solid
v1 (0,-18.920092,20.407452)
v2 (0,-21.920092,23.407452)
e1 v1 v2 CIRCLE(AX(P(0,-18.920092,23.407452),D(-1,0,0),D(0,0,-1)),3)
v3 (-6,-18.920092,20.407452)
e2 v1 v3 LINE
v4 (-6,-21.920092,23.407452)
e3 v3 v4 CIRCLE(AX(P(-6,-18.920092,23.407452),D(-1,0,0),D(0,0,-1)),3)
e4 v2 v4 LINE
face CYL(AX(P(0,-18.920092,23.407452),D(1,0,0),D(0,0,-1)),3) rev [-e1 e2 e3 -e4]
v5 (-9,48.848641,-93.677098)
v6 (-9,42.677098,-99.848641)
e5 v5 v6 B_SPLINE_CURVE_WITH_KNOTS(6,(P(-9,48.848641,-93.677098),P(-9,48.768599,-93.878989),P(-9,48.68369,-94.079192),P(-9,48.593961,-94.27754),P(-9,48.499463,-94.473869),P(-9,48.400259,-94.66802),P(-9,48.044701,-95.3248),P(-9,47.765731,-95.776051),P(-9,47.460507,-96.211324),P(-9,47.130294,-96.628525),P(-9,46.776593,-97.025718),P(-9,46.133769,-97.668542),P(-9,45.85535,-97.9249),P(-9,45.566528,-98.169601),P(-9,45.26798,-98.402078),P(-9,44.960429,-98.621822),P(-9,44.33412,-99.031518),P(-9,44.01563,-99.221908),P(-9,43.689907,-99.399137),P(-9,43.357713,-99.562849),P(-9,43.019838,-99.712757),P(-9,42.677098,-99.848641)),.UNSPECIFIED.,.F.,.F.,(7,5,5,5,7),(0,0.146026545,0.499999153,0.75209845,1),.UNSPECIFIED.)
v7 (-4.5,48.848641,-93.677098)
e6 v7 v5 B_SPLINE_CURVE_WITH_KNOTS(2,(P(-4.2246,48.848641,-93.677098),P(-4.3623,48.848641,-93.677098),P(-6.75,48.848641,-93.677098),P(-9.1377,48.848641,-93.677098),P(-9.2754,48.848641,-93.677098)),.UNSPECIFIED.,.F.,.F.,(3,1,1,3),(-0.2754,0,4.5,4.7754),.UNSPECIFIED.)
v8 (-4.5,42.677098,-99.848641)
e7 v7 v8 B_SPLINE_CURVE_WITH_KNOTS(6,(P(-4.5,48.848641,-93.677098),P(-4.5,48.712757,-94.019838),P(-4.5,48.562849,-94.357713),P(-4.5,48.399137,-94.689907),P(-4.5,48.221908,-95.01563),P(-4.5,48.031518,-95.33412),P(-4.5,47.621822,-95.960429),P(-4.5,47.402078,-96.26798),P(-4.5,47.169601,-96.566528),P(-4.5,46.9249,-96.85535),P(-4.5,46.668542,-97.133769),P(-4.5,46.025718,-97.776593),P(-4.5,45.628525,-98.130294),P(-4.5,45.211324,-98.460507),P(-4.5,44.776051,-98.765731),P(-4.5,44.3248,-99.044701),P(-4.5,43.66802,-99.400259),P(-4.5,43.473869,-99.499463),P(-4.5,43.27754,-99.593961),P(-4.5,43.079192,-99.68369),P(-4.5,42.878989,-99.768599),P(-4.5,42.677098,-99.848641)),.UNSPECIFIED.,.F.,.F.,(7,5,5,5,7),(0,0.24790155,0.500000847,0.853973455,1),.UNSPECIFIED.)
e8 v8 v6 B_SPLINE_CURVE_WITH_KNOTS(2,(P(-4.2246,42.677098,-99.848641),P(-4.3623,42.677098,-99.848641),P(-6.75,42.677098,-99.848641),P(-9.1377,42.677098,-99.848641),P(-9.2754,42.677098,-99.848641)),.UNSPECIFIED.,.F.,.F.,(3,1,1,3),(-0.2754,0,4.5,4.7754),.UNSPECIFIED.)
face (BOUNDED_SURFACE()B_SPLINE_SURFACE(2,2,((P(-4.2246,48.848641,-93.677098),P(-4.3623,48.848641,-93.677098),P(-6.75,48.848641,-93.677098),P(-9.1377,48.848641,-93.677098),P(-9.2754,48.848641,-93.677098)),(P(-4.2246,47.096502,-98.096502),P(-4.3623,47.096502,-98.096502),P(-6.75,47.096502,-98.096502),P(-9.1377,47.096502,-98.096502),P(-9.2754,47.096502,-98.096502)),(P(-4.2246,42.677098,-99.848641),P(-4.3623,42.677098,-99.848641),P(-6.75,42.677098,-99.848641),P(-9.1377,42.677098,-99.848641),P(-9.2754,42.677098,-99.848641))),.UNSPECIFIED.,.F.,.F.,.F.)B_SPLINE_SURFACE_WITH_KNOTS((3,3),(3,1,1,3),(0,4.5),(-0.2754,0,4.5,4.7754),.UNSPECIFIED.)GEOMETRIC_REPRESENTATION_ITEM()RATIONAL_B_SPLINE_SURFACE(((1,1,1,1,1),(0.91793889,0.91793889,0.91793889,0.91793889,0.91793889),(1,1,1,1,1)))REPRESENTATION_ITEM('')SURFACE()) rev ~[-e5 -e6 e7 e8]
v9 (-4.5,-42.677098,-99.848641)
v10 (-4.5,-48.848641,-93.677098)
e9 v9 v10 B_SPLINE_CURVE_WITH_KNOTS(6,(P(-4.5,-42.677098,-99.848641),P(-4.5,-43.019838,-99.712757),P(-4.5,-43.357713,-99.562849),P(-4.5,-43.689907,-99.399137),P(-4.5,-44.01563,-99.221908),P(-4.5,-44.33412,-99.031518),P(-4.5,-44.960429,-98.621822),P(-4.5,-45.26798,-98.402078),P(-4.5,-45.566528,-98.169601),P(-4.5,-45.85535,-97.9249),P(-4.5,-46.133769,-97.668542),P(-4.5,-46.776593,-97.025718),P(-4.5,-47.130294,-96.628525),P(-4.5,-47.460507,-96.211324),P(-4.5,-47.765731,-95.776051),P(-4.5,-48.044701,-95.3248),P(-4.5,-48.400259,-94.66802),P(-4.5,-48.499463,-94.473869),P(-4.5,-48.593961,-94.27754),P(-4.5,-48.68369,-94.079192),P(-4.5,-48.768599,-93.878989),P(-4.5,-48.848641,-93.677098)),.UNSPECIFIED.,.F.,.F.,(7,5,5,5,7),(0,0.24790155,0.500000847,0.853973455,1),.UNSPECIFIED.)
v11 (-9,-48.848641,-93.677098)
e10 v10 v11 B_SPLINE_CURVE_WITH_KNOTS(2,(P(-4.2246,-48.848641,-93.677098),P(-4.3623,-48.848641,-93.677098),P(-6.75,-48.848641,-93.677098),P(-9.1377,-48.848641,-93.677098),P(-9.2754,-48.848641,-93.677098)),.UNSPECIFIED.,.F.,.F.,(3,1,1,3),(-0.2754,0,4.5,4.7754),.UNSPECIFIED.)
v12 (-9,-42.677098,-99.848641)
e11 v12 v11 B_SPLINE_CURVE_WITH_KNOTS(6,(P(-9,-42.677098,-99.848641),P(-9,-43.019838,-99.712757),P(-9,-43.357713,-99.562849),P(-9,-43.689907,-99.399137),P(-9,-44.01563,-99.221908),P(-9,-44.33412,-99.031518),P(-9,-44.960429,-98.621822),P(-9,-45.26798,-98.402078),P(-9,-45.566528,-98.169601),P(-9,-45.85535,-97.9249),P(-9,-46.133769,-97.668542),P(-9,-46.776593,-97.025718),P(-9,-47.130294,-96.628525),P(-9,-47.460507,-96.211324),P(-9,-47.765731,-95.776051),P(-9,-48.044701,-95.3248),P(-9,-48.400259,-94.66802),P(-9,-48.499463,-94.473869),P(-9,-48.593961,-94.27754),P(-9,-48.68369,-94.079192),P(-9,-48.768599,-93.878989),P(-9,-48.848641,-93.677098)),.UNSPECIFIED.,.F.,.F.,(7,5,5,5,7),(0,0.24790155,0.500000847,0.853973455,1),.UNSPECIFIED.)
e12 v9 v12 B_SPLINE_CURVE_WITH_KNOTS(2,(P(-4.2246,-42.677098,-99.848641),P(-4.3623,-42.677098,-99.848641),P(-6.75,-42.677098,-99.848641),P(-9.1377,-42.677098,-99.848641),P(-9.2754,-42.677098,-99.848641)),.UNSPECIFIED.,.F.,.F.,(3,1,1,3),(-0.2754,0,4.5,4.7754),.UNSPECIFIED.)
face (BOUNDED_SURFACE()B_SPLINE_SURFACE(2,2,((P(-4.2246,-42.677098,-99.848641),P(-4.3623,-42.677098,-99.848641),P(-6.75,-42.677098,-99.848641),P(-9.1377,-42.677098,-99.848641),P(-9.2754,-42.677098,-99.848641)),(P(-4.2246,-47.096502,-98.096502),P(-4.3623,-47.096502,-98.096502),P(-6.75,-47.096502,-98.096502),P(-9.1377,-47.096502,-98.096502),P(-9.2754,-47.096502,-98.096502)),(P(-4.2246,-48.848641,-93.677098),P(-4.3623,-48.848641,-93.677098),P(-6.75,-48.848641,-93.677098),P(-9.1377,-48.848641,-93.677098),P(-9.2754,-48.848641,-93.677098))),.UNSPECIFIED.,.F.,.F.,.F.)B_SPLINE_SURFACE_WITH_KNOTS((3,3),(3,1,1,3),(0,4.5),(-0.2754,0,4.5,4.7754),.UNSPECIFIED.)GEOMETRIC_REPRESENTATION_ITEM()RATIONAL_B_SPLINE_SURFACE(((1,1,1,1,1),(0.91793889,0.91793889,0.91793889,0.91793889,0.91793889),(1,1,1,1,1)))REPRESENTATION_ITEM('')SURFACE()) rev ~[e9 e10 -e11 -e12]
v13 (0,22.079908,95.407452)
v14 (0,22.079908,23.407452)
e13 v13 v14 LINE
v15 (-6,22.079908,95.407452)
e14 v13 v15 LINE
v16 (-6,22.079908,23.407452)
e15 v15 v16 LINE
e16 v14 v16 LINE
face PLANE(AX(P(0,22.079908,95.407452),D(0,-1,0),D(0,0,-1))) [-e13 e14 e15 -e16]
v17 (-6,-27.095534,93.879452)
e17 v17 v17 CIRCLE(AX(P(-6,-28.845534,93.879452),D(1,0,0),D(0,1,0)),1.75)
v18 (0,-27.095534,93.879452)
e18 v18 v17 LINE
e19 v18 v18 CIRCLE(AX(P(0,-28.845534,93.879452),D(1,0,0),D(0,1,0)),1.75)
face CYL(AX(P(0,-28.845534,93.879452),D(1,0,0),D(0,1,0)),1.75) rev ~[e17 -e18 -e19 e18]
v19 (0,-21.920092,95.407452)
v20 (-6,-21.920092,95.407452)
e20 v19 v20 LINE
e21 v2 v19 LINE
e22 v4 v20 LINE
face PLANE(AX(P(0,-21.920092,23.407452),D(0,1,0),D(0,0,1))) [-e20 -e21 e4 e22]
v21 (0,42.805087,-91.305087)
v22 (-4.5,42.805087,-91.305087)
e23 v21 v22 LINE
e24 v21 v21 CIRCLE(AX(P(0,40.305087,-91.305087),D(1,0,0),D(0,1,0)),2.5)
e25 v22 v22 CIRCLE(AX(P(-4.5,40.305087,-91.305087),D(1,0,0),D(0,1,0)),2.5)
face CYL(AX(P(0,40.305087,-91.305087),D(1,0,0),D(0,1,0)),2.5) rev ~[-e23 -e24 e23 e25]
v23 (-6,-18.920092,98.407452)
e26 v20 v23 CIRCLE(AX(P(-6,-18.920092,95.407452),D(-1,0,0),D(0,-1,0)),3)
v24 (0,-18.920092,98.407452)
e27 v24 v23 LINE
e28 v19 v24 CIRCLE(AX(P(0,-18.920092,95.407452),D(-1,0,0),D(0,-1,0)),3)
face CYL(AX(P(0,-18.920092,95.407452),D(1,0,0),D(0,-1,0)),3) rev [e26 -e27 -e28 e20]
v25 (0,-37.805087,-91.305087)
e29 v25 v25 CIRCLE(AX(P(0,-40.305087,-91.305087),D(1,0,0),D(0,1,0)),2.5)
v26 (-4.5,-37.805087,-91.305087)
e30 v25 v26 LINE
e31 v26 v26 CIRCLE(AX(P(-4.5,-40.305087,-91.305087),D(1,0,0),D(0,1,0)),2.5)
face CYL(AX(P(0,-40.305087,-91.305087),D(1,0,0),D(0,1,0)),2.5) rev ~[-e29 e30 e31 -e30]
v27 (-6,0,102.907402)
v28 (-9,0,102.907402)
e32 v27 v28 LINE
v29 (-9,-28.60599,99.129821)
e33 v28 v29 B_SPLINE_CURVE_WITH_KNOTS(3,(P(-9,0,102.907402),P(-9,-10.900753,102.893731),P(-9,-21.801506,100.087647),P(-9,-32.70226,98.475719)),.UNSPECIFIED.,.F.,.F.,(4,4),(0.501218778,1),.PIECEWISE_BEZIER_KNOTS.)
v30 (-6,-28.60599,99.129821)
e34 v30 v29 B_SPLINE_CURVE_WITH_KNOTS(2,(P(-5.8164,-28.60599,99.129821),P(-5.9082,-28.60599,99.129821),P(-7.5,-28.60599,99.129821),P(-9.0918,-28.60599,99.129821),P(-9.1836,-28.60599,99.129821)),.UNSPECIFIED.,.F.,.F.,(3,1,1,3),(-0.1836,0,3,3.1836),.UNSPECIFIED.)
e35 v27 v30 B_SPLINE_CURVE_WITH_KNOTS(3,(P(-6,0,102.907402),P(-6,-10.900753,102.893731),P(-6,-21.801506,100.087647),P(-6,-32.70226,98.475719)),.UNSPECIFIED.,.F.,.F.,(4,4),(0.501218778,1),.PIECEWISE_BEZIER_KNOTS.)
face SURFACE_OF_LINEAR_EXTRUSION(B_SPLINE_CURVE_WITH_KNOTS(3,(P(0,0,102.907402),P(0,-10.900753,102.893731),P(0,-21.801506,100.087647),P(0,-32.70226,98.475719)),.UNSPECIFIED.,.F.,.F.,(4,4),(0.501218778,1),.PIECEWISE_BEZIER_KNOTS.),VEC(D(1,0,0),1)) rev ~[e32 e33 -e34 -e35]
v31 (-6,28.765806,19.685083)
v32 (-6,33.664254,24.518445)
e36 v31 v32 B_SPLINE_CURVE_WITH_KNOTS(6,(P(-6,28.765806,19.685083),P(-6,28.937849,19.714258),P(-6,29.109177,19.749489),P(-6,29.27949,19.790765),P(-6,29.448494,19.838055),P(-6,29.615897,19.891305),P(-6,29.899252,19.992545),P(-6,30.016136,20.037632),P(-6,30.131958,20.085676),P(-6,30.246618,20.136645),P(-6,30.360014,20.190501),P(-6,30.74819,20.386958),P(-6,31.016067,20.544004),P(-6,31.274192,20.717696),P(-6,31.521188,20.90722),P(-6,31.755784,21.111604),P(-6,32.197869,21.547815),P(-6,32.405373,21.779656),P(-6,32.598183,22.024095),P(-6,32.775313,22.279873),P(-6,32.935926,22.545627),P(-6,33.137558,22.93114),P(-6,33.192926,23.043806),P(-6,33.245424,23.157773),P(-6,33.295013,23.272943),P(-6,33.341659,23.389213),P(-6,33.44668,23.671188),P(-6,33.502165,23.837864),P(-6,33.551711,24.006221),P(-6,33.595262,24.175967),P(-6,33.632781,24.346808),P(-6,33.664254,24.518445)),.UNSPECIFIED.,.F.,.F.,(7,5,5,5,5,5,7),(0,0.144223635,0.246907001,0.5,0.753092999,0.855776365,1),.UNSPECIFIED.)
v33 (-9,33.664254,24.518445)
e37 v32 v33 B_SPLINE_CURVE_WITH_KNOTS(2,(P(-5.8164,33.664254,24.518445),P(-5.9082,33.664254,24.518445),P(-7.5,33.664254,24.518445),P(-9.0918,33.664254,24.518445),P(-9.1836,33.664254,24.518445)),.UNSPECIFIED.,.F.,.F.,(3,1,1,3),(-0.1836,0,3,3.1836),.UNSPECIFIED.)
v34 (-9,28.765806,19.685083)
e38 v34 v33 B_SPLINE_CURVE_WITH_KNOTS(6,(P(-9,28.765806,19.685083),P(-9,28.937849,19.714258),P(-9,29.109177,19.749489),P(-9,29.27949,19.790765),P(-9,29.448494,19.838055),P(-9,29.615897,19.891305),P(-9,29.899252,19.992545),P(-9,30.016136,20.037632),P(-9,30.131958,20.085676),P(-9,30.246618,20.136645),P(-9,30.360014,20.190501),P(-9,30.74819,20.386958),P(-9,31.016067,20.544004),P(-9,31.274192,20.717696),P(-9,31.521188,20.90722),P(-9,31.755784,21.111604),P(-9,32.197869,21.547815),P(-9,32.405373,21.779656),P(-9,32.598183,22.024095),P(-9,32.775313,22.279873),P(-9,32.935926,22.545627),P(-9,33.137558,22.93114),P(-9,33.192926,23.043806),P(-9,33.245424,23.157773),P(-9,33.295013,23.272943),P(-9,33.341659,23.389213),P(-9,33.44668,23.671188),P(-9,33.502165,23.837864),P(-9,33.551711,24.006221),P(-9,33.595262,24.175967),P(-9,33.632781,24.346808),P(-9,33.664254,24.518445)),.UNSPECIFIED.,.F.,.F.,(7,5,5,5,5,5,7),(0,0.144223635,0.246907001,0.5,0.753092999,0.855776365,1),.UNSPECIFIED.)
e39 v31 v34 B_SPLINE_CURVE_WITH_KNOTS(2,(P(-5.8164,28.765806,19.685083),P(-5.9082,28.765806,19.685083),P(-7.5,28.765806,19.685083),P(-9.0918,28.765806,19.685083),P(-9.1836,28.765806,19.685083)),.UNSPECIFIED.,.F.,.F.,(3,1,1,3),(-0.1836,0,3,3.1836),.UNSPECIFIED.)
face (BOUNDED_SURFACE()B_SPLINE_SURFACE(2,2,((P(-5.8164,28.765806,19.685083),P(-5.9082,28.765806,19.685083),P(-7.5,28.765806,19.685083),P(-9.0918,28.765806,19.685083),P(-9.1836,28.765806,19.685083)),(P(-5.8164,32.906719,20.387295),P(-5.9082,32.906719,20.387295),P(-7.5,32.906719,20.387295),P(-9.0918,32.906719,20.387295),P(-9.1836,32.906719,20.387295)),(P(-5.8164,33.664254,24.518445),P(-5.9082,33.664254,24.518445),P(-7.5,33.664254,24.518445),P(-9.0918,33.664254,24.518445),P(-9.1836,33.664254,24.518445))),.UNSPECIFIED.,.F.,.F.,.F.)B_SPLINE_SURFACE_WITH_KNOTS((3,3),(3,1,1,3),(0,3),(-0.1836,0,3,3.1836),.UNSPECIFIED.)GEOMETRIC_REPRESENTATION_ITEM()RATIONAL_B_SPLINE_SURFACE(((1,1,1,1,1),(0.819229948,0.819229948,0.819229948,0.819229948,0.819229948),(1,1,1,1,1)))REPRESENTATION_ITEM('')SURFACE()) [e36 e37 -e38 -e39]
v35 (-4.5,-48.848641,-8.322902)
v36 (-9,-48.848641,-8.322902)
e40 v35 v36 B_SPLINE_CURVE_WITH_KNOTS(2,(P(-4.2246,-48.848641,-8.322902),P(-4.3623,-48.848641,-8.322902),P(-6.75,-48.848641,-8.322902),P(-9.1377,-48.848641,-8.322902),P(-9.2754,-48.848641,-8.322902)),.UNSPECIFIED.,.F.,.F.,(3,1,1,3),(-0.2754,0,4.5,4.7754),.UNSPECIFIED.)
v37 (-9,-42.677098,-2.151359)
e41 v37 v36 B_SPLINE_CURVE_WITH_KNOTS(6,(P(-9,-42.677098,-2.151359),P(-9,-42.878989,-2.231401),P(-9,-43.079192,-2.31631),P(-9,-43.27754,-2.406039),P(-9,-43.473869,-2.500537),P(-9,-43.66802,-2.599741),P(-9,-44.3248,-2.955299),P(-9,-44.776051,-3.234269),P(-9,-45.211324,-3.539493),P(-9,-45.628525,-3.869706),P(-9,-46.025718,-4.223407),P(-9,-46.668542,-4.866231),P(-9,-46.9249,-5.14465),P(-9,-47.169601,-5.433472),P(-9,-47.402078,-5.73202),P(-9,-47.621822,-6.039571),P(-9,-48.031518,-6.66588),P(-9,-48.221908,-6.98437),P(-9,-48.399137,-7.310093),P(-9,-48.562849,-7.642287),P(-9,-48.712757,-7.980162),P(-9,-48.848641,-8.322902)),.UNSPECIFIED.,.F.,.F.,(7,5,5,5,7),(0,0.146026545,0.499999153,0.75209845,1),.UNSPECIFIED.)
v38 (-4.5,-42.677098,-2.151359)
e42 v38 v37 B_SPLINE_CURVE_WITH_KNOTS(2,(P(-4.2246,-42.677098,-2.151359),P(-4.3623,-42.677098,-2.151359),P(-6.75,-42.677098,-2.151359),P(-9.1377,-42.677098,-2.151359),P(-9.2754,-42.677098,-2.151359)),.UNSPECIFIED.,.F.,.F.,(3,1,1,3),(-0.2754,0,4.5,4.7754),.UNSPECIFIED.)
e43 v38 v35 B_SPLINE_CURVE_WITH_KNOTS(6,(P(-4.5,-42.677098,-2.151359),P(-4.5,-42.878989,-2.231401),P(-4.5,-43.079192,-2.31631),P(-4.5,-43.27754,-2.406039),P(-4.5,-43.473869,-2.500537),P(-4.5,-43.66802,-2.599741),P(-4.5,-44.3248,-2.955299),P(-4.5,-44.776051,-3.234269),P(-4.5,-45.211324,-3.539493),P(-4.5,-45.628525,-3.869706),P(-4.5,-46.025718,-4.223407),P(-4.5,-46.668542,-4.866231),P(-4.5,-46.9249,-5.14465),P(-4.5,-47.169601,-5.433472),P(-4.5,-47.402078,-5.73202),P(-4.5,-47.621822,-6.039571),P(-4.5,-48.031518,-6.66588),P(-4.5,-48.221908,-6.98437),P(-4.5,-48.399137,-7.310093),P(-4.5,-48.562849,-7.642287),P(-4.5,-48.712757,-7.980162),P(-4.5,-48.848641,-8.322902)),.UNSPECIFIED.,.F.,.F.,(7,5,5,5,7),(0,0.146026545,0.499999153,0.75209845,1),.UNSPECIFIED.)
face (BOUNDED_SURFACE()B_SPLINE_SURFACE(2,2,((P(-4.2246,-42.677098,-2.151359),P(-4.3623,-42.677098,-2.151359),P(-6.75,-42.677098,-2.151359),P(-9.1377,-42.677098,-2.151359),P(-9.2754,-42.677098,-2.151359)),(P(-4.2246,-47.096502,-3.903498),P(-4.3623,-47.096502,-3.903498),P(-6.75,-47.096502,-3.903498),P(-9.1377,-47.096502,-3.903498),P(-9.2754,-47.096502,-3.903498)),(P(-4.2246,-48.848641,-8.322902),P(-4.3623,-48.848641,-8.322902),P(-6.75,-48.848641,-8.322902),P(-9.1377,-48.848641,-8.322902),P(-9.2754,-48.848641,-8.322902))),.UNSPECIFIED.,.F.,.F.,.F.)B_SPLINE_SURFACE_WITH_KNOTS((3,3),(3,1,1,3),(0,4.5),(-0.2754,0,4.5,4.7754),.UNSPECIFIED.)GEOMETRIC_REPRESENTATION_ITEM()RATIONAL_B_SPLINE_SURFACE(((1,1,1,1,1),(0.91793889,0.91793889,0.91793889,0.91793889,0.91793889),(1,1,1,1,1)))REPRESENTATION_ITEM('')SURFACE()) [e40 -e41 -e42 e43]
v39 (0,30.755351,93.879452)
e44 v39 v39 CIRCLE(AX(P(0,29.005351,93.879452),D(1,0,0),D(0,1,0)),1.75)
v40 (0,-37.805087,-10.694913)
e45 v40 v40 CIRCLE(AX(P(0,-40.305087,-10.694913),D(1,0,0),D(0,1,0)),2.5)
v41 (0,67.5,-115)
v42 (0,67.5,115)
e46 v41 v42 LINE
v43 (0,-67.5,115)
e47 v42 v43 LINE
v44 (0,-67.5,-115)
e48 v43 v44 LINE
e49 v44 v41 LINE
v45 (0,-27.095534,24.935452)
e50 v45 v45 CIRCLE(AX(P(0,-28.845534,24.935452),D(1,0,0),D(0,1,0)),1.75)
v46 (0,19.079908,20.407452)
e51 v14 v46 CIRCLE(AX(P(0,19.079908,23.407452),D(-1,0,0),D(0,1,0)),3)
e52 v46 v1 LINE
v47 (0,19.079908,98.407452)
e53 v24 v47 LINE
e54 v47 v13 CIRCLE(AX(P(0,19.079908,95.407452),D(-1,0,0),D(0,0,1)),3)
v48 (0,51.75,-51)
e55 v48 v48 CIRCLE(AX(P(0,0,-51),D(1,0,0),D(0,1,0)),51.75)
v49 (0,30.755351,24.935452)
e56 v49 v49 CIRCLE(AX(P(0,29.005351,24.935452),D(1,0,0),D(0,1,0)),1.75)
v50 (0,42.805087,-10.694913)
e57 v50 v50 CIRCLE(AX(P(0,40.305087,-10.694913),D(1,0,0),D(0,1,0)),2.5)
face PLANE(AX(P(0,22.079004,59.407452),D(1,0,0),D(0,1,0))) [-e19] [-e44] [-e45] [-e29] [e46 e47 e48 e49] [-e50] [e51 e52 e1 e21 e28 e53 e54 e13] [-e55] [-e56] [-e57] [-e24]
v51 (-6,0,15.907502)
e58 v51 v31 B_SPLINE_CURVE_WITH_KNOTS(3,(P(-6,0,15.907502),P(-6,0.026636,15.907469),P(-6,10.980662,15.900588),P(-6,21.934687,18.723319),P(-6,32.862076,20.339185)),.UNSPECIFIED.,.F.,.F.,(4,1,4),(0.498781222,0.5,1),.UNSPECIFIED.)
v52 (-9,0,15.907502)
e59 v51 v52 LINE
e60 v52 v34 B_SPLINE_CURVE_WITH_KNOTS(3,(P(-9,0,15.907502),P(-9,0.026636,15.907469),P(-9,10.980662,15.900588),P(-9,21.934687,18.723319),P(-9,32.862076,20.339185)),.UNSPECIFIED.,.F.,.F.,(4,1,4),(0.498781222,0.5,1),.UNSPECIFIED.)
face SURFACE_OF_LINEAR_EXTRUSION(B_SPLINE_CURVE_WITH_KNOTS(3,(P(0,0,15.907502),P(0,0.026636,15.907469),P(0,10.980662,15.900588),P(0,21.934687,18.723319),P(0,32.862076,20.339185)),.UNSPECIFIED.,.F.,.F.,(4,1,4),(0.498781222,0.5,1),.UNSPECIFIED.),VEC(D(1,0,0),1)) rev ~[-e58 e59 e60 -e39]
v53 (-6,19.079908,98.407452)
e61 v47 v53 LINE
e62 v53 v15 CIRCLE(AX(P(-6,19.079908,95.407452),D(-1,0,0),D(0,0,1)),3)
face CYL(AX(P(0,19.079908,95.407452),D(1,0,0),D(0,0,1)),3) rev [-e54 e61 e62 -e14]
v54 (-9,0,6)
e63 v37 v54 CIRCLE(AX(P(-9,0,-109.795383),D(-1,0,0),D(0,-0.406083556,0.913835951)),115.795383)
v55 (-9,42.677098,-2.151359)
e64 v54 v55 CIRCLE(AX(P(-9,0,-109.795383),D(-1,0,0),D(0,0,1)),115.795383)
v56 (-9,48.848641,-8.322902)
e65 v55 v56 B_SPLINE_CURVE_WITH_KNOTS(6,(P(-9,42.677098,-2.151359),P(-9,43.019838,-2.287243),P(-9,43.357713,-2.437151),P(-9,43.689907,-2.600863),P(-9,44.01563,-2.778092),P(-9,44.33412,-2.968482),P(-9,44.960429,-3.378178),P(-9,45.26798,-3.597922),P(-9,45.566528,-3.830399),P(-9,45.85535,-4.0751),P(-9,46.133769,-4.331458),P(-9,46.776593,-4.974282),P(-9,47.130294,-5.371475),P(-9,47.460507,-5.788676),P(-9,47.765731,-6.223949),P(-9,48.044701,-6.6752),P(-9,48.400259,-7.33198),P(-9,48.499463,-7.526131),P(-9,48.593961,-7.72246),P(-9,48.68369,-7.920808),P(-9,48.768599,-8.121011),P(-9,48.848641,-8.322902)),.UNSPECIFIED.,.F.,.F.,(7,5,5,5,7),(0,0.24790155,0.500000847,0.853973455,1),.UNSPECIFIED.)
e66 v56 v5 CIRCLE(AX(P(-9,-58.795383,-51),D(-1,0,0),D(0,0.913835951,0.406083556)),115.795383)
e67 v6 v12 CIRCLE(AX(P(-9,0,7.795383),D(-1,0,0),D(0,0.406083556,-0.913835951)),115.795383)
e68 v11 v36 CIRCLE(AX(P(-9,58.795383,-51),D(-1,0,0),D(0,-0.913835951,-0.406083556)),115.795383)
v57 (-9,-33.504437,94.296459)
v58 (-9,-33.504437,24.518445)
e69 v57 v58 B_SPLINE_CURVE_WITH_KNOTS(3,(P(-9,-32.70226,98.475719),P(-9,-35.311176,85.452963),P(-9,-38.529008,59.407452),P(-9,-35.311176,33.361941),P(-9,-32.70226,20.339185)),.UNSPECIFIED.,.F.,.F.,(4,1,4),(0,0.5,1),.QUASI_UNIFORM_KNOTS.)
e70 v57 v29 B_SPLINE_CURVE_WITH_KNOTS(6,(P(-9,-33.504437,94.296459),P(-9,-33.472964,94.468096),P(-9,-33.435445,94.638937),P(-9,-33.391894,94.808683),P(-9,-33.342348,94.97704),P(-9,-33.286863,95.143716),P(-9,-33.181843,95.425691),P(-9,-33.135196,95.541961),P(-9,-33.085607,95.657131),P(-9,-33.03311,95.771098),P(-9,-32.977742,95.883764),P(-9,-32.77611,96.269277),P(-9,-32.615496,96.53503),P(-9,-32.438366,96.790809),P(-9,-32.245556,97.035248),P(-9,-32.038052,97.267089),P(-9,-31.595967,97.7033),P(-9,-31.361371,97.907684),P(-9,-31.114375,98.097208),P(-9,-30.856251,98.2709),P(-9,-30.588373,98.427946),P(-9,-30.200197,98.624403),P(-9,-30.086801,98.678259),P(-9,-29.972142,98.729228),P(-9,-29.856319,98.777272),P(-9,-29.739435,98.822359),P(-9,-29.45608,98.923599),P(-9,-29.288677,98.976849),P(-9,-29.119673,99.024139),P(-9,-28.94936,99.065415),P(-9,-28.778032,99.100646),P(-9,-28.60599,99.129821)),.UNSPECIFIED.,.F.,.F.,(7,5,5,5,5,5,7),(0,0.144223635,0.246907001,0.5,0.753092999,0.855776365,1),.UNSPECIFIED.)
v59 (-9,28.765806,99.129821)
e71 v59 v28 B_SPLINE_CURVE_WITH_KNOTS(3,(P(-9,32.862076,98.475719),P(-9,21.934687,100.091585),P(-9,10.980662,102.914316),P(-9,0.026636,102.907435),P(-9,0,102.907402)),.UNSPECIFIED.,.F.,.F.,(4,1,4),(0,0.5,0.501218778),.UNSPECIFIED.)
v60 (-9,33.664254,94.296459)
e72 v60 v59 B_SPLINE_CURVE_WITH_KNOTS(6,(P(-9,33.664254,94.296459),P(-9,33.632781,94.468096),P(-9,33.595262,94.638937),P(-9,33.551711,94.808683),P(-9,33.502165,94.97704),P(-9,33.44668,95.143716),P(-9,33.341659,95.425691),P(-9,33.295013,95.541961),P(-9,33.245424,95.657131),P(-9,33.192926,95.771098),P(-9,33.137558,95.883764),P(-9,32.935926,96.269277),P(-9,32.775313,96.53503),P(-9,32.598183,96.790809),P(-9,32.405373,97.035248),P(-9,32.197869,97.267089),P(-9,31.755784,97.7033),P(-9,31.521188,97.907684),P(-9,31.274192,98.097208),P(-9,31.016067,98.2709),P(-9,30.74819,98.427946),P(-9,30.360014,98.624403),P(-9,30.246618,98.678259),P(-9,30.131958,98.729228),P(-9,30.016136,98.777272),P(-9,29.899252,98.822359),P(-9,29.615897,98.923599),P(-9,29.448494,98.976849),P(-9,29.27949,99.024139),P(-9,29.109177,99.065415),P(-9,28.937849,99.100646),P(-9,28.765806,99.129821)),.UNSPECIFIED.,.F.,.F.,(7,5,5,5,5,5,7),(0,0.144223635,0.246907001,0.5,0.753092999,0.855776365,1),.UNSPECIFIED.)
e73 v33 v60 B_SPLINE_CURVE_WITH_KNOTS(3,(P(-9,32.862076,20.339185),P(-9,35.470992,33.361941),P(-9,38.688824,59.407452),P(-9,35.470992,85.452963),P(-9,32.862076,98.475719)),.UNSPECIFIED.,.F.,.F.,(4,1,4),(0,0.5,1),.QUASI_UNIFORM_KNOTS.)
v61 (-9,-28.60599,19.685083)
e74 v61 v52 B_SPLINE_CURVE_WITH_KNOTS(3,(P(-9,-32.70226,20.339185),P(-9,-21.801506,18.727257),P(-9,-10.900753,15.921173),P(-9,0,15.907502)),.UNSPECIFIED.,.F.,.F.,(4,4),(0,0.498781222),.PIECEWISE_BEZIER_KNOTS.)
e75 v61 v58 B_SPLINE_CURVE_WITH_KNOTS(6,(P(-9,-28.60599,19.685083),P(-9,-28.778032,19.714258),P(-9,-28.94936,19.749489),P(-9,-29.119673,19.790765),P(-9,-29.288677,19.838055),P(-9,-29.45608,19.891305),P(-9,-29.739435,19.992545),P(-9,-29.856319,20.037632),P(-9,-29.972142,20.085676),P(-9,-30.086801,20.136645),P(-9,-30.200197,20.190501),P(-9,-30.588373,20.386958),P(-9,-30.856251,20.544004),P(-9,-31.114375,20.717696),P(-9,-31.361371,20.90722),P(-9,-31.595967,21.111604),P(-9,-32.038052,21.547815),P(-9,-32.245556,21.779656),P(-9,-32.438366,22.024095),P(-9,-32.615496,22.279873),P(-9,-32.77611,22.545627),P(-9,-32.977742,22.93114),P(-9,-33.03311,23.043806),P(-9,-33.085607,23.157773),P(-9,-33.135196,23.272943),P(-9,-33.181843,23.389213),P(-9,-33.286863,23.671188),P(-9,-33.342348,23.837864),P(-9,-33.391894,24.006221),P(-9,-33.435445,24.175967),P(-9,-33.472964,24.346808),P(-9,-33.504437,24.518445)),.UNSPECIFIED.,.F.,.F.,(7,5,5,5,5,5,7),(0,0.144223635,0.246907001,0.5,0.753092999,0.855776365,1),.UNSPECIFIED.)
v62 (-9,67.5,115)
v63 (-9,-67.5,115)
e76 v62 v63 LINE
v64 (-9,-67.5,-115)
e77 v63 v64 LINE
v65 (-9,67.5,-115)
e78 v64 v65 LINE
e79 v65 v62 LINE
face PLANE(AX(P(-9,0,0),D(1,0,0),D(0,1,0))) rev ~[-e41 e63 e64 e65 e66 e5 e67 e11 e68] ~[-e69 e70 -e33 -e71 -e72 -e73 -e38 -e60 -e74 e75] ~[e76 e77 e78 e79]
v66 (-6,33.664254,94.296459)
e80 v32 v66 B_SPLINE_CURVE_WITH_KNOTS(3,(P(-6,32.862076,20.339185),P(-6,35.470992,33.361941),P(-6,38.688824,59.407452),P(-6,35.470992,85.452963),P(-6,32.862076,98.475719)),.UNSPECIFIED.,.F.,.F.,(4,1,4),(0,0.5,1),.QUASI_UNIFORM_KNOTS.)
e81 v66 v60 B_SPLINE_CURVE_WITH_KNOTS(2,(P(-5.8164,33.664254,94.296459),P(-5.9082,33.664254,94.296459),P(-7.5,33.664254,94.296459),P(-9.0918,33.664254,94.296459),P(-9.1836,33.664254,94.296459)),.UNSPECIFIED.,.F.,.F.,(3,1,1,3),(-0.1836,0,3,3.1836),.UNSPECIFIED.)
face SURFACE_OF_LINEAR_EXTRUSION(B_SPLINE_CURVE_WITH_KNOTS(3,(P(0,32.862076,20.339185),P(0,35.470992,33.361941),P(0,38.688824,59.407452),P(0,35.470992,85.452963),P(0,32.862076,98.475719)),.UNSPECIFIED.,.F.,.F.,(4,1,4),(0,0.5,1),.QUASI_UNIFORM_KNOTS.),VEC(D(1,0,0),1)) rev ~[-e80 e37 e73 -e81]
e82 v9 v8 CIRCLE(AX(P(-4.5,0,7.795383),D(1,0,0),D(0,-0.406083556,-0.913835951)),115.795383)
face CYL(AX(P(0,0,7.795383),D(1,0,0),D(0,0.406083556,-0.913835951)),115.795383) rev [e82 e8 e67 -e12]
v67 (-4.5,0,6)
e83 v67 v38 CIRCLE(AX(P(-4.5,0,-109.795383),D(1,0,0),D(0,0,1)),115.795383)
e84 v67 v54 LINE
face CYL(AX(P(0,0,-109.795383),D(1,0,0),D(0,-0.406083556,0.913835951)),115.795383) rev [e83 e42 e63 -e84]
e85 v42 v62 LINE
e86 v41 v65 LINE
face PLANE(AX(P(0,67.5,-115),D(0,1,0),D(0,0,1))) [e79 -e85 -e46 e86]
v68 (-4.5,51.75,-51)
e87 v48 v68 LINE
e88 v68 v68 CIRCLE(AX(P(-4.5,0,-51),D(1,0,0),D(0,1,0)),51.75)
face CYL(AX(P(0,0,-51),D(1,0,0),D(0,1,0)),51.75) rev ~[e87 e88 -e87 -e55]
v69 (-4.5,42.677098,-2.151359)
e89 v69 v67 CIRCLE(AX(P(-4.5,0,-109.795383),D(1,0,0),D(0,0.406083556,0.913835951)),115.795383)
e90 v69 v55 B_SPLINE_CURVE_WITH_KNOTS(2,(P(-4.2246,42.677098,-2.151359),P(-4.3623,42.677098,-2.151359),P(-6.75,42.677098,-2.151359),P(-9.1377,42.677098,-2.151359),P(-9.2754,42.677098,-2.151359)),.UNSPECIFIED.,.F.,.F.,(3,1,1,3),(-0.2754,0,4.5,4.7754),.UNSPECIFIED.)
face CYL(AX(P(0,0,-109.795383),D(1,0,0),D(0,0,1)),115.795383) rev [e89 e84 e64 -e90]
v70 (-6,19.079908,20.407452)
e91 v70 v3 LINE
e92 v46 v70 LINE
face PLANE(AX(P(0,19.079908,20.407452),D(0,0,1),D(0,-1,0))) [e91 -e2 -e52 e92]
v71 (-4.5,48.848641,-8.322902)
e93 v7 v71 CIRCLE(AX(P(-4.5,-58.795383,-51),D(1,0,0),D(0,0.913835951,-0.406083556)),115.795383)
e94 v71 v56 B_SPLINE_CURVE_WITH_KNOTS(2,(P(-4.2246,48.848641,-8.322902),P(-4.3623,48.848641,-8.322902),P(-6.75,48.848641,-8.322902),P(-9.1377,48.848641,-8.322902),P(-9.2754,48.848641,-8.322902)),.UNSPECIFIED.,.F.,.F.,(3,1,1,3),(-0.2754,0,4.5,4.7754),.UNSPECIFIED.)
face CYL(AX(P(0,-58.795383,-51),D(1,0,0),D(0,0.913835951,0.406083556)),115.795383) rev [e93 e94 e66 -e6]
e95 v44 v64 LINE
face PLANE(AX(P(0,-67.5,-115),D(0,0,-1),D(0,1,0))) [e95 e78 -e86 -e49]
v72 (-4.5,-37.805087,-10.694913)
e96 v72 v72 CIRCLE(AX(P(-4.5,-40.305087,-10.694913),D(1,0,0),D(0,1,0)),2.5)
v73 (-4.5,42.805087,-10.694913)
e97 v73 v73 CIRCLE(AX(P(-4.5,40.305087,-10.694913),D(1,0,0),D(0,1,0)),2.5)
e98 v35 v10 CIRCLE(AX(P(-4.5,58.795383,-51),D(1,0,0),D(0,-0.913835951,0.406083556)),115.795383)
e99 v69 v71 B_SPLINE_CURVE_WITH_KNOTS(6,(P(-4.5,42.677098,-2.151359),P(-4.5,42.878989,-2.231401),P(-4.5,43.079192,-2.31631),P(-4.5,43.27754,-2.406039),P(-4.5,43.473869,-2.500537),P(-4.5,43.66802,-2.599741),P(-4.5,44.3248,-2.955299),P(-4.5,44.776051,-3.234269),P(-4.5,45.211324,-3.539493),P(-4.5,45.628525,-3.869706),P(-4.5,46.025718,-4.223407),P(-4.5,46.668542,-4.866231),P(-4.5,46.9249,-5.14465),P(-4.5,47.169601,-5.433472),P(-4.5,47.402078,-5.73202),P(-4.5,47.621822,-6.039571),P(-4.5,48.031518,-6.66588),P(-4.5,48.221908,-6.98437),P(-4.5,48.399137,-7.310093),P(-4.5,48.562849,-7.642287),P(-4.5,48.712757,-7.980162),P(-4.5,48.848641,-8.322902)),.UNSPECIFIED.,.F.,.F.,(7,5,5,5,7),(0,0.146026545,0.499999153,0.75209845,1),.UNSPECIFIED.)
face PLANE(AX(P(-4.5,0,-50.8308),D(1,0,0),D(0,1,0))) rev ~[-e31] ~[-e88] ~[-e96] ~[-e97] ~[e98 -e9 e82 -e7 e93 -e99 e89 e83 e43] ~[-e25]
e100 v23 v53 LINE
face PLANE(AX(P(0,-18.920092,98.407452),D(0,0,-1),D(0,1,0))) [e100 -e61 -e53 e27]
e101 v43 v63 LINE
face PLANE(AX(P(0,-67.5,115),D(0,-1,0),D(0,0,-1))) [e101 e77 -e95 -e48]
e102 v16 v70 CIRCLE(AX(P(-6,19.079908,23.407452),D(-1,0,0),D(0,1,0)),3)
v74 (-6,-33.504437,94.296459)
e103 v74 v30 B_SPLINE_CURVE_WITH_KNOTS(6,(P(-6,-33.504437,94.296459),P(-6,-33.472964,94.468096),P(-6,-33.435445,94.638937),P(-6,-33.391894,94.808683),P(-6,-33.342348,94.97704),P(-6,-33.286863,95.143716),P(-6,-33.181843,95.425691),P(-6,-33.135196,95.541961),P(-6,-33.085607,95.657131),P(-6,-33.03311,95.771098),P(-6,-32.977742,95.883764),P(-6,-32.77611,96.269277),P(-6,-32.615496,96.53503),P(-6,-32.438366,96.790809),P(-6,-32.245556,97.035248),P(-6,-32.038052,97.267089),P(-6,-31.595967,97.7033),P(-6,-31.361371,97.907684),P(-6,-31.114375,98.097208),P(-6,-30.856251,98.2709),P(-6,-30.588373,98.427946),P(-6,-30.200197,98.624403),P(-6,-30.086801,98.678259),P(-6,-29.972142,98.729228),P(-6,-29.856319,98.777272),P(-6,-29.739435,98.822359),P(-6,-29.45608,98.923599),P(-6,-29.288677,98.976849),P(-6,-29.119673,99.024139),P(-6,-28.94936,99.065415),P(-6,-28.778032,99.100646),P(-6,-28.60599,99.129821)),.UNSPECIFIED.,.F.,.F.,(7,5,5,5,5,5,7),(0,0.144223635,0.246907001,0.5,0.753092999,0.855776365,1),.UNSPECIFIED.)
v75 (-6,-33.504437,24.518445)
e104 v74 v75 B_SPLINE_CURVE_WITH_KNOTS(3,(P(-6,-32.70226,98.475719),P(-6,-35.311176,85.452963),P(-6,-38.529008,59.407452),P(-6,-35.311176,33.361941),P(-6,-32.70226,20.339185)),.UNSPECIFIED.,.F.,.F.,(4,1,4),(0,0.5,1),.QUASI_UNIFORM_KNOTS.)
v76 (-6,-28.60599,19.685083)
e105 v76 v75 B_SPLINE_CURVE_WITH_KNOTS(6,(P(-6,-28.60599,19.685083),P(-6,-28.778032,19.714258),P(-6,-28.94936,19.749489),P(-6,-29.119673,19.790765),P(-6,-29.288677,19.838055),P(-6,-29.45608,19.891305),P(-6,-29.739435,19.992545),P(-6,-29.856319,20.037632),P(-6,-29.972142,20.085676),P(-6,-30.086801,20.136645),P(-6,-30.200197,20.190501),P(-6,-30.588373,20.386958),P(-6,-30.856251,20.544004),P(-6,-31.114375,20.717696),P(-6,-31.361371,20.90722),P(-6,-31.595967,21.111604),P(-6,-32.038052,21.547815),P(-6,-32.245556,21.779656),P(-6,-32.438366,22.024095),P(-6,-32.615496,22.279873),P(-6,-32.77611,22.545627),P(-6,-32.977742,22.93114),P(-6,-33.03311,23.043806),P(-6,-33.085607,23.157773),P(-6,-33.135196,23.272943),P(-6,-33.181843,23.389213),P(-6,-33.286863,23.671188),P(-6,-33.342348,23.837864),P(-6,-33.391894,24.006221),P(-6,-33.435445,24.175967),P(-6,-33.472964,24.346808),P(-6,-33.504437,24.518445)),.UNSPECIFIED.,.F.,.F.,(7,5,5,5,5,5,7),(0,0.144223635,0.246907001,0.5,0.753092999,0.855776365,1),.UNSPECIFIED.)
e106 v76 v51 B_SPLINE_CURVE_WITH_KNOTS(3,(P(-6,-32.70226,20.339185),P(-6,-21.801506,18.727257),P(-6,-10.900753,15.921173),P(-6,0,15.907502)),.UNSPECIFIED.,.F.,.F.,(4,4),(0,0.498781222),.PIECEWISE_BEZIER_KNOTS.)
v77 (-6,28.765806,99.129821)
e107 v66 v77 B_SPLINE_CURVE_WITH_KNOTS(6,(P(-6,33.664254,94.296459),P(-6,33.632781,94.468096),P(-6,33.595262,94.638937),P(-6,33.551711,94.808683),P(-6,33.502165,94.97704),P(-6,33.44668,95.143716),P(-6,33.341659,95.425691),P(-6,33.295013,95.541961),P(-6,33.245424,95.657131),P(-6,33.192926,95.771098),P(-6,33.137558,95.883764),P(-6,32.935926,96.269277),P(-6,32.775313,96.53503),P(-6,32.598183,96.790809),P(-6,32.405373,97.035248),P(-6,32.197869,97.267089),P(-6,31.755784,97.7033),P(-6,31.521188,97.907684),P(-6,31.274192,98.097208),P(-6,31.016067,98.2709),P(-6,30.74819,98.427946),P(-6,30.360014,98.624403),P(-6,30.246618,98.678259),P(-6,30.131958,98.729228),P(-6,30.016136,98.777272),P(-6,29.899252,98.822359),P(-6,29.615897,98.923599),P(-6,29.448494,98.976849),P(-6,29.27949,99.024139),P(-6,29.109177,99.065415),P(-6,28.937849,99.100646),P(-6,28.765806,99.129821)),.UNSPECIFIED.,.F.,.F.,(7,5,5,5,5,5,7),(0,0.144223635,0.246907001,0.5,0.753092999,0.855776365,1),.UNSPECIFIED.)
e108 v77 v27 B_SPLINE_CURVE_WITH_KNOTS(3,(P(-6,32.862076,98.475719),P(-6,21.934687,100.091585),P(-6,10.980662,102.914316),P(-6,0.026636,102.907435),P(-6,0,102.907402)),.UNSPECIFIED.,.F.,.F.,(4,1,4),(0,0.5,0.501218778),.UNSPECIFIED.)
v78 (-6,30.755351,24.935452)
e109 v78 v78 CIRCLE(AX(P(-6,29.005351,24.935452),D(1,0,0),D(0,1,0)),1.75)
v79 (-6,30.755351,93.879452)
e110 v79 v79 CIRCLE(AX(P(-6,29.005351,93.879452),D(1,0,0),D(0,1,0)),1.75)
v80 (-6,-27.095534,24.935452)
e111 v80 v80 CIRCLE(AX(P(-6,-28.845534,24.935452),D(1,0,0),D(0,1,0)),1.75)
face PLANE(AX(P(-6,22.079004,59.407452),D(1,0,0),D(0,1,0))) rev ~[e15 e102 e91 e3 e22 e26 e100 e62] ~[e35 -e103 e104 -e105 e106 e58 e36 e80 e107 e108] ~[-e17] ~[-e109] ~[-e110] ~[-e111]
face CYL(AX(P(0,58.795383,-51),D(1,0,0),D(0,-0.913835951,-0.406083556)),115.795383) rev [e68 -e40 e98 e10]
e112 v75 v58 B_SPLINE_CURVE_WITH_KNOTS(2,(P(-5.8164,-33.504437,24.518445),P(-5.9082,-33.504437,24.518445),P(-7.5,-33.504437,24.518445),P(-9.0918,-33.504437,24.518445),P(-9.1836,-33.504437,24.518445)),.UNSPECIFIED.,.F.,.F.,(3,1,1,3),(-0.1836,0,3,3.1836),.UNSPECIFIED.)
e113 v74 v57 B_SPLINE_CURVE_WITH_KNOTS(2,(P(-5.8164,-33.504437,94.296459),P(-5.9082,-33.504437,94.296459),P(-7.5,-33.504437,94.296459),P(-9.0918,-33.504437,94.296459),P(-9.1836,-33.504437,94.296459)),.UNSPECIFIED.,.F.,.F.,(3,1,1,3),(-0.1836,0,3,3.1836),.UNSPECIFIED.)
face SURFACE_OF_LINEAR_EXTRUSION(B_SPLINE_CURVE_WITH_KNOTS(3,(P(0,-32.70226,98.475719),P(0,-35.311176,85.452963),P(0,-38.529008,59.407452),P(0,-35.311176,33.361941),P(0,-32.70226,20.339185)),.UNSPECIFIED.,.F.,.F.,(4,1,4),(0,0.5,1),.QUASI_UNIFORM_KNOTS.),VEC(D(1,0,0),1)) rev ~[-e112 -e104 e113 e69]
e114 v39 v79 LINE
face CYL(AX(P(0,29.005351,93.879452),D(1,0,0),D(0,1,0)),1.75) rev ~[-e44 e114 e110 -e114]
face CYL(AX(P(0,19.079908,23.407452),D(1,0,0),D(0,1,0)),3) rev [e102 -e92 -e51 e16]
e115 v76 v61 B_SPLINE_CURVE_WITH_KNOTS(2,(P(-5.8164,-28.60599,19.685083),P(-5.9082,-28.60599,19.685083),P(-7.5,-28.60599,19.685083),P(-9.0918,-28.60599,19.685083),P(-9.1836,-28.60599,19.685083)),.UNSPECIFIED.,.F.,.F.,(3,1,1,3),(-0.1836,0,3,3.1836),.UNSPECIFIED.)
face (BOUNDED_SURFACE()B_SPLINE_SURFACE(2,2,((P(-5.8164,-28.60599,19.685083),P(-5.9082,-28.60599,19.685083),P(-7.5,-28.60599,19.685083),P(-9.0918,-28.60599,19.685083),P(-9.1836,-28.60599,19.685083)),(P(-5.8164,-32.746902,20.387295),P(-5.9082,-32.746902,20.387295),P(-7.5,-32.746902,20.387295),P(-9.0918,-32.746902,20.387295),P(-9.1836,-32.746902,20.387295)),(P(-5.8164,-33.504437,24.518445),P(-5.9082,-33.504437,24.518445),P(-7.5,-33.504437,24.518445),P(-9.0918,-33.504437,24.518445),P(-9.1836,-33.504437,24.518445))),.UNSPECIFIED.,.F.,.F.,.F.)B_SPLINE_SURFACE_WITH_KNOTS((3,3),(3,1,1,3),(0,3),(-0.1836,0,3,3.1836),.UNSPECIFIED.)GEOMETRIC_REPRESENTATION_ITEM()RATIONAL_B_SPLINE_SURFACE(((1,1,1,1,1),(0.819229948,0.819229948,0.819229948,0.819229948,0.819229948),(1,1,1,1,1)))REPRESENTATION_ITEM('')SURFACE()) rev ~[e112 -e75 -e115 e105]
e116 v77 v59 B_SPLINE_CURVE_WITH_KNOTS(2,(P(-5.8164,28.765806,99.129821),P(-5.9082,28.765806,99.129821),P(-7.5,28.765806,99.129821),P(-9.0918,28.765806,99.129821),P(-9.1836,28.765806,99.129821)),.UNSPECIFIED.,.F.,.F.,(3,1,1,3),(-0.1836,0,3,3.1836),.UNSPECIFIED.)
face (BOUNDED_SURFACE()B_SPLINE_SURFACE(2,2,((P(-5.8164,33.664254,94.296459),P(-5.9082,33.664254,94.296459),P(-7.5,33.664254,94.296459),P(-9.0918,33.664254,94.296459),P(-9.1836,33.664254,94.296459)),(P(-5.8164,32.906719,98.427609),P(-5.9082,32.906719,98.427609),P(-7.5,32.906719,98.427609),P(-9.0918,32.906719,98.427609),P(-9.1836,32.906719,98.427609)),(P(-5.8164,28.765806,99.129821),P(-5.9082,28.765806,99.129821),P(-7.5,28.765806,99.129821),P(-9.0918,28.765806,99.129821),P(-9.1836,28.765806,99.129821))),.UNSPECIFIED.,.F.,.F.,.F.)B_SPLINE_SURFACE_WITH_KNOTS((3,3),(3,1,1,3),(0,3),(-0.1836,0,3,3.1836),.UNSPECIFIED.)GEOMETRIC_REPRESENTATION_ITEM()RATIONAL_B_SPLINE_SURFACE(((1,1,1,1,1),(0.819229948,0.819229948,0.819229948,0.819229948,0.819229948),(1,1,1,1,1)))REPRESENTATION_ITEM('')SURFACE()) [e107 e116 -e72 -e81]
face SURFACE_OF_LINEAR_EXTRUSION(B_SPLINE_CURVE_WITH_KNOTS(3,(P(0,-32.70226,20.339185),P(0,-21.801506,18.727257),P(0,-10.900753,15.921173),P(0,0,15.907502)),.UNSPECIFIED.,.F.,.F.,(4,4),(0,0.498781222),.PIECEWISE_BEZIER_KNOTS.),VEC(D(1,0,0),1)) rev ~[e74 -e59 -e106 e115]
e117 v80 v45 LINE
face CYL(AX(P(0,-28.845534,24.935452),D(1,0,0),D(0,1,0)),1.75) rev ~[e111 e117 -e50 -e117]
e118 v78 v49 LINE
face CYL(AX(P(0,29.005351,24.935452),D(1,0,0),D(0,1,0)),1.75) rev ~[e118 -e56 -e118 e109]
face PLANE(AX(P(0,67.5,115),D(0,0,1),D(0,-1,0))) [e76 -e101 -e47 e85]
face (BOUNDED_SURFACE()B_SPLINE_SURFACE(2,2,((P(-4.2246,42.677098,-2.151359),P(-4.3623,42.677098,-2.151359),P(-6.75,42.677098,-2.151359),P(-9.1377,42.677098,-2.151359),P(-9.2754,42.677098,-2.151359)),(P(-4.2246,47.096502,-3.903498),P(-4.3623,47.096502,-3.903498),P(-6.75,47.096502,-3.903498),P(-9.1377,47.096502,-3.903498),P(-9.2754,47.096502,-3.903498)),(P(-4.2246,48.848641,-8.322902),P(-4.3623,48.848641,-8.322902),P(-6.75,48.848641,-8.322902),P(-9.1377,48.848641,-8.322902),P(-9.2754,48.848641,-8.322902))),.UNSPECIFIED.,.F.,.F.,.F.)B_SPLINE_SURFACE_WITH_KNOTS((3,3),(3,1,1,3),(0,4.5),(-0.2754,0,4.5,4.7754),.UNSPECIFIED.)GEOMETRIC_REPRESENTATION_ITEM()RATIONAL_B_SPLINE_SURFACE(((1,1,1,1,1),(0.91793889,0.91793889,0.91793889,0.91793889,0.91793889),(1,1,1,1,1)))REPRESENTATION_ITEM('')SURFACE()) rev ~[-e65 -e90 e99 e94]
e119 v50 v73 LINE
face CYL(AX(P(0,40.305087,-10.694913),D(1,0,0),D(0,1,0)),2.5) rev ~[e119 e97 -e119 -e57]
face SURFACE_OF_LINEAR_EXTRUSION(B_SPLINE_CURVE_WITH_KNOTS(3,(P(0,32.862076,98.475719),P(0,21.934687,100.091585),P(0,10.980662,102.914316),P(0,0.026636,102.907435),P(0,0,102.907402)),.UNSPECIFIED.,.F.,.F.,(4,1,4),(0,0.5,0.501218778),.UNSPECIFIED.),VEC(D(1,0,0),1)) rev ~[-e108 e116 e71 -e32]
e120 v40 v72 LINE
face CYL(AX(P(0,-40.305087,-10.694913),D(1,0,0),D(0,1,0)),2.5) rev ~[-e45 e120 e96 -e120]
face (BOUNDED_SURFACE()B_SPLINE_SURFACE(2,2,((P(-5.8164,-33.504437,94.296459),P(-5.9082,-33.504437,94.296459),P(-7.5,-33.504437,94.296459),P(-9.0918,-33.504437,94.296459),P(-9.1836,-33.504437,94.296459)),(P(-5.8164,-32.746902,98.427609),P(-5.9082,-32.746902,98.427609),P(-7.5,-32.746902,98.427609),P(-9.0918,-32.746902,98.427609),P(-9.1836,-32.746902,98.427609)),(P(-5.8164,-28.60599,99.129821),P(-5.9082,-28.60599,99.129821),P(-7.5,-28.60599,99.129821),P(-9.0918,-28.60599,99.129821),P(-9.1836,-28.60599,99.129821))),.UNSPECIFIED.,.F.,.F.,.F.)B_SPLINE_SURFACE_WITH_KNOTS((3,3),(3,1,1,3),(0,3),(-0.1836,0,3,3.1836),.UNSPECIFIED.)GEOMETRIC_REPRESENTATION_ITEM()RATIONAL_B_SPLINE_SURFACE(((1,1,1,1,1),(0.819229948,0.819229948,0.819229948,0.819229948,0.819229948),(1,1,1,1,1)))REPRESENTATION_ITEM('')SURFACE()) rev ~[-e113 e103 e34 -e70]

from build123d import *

# Parameters (mm, degrees)
F1_DEPTH = 9
F0_R     = 2.5
F0_R_2   = 51.75
F2_DEPTH = 4.5
F0_R_3   = 3
F0_R_4   = 1.75
F3_R     = 11
F4_DEPTH = 6
F5_R     = 6


# Not quite as in the source:
# - a feature names something its author has since deleted; it is built from what else it names


with BuildPart() as f1:
    # F0 (on Right) → F1 (new body)
    with BuildSketch(Plane.YZ):
        Polygon((67.5, -115), (67.5, 115), (0, 115), (-67.5, 115), (-67.5, -115), align=None)
        with BuildLine():
            ThreePointArc((-47.0226009489, -3.9773990511), (-24.0347326375, 3.4781900517), (0, 6))
            ThreePointArc((0, 6), (24.0347326375, 3.4781900517), (47.0226009489, -3.9773990511))
            ThreePointArc((47.0226009489, -3.9773990511), (57, -51), (47.0226009489, -98.0226009489))
            ThreePointArc((47.0226009489, -98.0226009489), (0, -108), (-47.0226009489, -98.0226009489))
            ThreePointArc((-47.0226009489, -98.0226009489), (-57, -51), (-47.0226009489, -3.9773990511))
        make_face(mode=Mode.SUBTRACT)
        with BuildLine():
            add(Edge.make_bspline(
                [(0, 102.9074018363), (-10.9007532398, 102.8937314348), (-21.8015064796, 100.0876465048), (-32.7022597194, 98.4757185701)],
                knots=[0.5012187781, 0.5012187781, 0.5012187781, 0.5012187781, 1, 1, 1, 1], degree=3))
            add(Edge.make_bspline(
                [(32.8620764687, 98.4757185701), (21.934687104, 100.0915852706), (10.9806616144, 102.9143158042), (0.0266361249, 102.9074352401), (0, 102.9074018363)],
                knots=[0, 0, 0, 0, 0.5, 0.5012187781, 0.5012187781, 0.5012187781, 0.5012187781], degree=3))
            add(Edge.make_bspline(
                [(32.8620764687, 20.339185372), (35.4709924216, 33.361940905), (38.6888243276, 59.4074519711), (35.4709924216, 85.4529630371), (32.8620764687, 98.4757185701)],
                knots=[0, 0, 0, 0, 0.5, 1, 1, 1, 1], degree=3))
            add(Edge.make_bspline(
                [(0, 15.9075021058), (0.0266361249, 15.907468702), (10.9806616144, 15.9005881379), (21.934687104, 18.7233186715), (32.8620764687, 20.339185372)],
                knots=[0.4987812219, 0.4987812219, 0.4987812219, 0.4987812219, 0.5, 1, 1, 1, 1], degree=3))
            add(Edge.make_bspline(
                [(-32.7022597194, 20.339185372), (-21.8015064796, 18.7272574373), (-10.9007532398, 15.9211725073), (0, 15.9075021058)],
                knots=[0, 0, 0, 0, 0.4987812219, 0.4987812219, 0.4987812219, 0.4987812219], degree=3))
            add(Edge.make_bspline(
                [(-32.7022597194, 98.4757185701), (-35.3111756724, 85.4529630371), (-38.5290075784, 59.4074519711), (-35.3111756724, 33.361940905), (-32.7022597194, 20.339185372)],
                knots=[0, 0, 0, 0, 0.5, 1, 1, 1, 1], degree=3))
        make_face(mode=Mode.SUBTRACT)
    extrude(amount=-F1_DEPTH)

    # F0 (on Right) → F2 (join)
    with BuildSketch(Plane.YZ):
        with BuildLine():
            ThreePointArc((47.0226009489, -3.9773990511), (24.0347326375, 3.4781900517), (0, 6))
            ThreePointArc((0, 6), (-24.0347326375, 3.4781900517), (-47.0226009489, -3.9773990511))
            ThreePointArc((-47.0226009489, -3.9773990511), (-57, -51), (-47.0226009489, -98.0226009489))
            ThreePointArc((-47.0226009489, -98.0226009489), (0, -108), (47.0226009489, -98.0226009489))
            ThreePointArc((47.0226009489, -98.0226009489), (57, -51), (47.0226009489, -3.9773990511))
        make_face()
        with Locations((-40.3050865276, -91.3050865276)):
            Circle(F0_R, mode=Mode.SUBTRACT)
        with Locations((-40.3050865276, -10.6949134724)):
            Circle(F0_R, mode=Mode.SUBTRACT)
        with Locations((40.3050865276, -91.3050865276)):
            Circle(F0_R, mode=Mode.SUBTRACT)
        with Locations((0, -51)):
            Circle(F0_R_2, mode=Mode.SUBTRACT)
        with Locations((40.3050865276, -10.6949134724)):
            Circle(F0_R, mode=Mode.SUBTRACT)
    extrude(amount=-F2_DEPTH)

    # F3
    f3_edges = [f1.edges().sort_by_distance(p)[0] for p in [
        (-6.75, 47.022601, -3.977399),
        (-6.75, -47.022601, -3.977399),
        (-6.75, -47.022601, -98.022601),
        (-6.75, 47.022601, -98.022601),
    ]]
    fillet(f3_edges, radius=F3_R)



with BuildPart() as f2:
    # F0 (on Right) → F2, piece 2 (new body)
    with BuildSketch(Plane.YZ):
        with Locations((-28.8455340613, 24.9354520307)):
            Circle(F0_R_3)
        with Locations((-28.8455340613, 24.9354520307)):
            Circle(F0_R_4, mode=Mode.SUBTRACT)
    extrude(amount=-F2_DEPTH)


with BuildPart() as f2b:
    # F0 (on Right) → F2, piece 3 (new body)
    with BuildSketch(Plane.YZ):
        with Locations((29.0053508105, 24.9354520307)):
            Circle(F0_R_3)
        with Locations((29.0053508105, 24.9354520307)):
            Circle(F0_R_4, mode=Mode.SUBTRACT)
    extrude(amount=-F2_DEPTH)


with BuildPart() as f1_1:
    add(f1.part)

    add(f2.part)  # F4 merges F2

    add(f2b.part)  # F4 merges F2b
    # F0 (on Right) → F4 (join)
    with BuildSketch(Plane.YZ):
        with BuildLine():
            add(Edge.make_bspline(
                [(32.8620764687, 98.4757185701), (21.934687104, 100.0915852706), (10.9806616144, 102.9143158042), (0.0266361249, 102.9074352401), (0, 102.9074018363)],
                knots=[0, 0, 0, 0, 0.5, 0.5012187781, 0.5012187781, 0.5012187781, 0.5012187781], degree=3))
            Line((0, 102.9074018363), (0, 98.4074519711))
            Line((0, 98.4074519711), (19.0799083746, 98.4074519711))
            ThreePointArc((19.0799083746, 98.4074519711), (21.2012287182, 97.5287723146), (22.0799083746, 95.4074519711))
            Line((22.0799083746, 95.4074519711), (22.0799083746, 23.4074519711))
            ThreePointArc((22.0799083746, 23.4074519711), (21.2012287182, 21.2861316275), (19.0799083746, 20.4074519711))
            Line((19.0799083746, 20.4074519711), (0, 20.4074519711))
            Line((0, 20.4074519711), (0, 15.9075021058))
            add(Edge.make_bspline(
                [(0, 15.9075021058), (0.0266361249, 15.907468702), (10.9806616144, 15.9005881379), (21.934687104, 18.7233186715), (32.8620764687, 20.339185372)],
                knots=[0.4987812219, 0.4987812219, 0.4987812219, 0.4987812219, 0.5, 1, 1, 1, 1], degree=3))
            add(Edge.make_bspline(
                [(32.8620764687, 20.339185372), (35.4709924216, 33.361940905), (38.6888243276, 59.4074519711), (35.4709924216, 85.4529630371), (32.8620764687, 98.4757185701)],
                knots=[0, 0, 0, 0, 0.5, 1, 1, 1, 1], degree=3))
        make_face()
        with Locations((29.0053508105, 24.9354520307)):
            Circle(F0_R_3, mode=Mode.SUBTRACT)
        with Locations((29.0053508105, 93.8794519114)):
            Circle(F0_R_3, mode=Mode.SUBTRACT)
        with BuildLine():
            Line((0, 98.4074519711), (0, 102.9074018363))
            add(Edge.make_bspline(
                [(0, 102.9074018363), (-10.9007532398, 102.8937314348), (-21.8015064796, 100.0876465048), (-32.7022597194, 98.4757185701)],
                knots=[0.5012187781, 0.5012187781, 0.5012187781, 0.5012187781, 1, 1, 1, 1], degree=3))
            add(Edge.make_bspline(
                [(-32.7022597194, 98.4757185701), (-35.3111756724, 85.4529630371), (-38.5290075784, 59.4074519711), (-35.3111756724, 33.361940905), (-32.7022597194, 20.339185372)],
                knots=[0, 0, 0, 0, 0.5, 1, 1, 1, 1], degree=3))
            add(Edge.make_bspline(
                [(-32.7022597194, 20.339185372), (-21.8015064796, 18.7272574373), (-10.9007532398, 15.9211725073), (0, 15.9075021058)],
                knots=[0, 0, 0, 0, 0.4987812219, 0.4987812219, 0.4987812219, 0.4987812219], degree=3))
            Line((0, 15.9075021058), (0, 20.4074519711))
            Line((0, 20.4074519711), (-18.9200916254, 20.4074519711))
            ThreePointArc((-18.9200916254, 20.4074519711), (-21.0414119689, 21.2861316275), (-21.9200916254, 23.4074519711))
            Line((-21.9200916254, 23.4074519711), (-21.9200916254, 95.4074519711))
            ThreePointArc((-21.9200916254, 95.4074519711), (-21.0414119689, 97.5287723146), (-18.9200916254, 98.4074519711))
            Line((-18.9200916254, 98.4074519711), (0, 98.4074519711))
        make_face()
        with Locations((-28.8455340613, 24.9354520307)):
            Circle(F0_R_3, mode=Mode.SUBTRACT)
        with Locations((-28.8455340613, 93.8794519114)):
            Circle(F0_R_3, mode=Mode.SUBTRACT)
        with Locations((29.0053508105, 93.8794519114)):
            Circle(F0_R_3)
        with Locations((29.0053508105, 93.8794519114)):
            Circle(F0_R_4, mode=Mode.SUBTRACT)
        with Locations((-28.8455340613, 93.8794519114)):
            Circle(F0_R_3)
        with Locations((-28.8455340613, 93.8794519114)):
            Circle(F0_R_4, mode=Mode.SUBTRACT)
        with Locations((-28.8455340613, 24.9354520307)):
            Circle(F0_R_3)
        with Locations((-28.8455340613, 24.9354520307)):
            Circle(F0_R_4, mode=Mode.SUBTRACT)
        with Locations((29.0053508105, 24.9354520307)):
            Circle(F0_R_3)
        with Locations((29.0053508105, 24.9354520307)):
            Circle(F0_R_4, mode=Mode.SUBTRACT)
    extrude(amount=-F4_DEPTH)

    # F5
    f5_edges = [f1_1.edges().sort_by_distance(p)[0] for p in [
        (-7.5, 32.862076, 98.475719),
        (-7.5, 32.862076, 20.339185),
        (-7.5, -32.70226, 20.339185),
        (-7.5, -32.70226, 98.475719),
    ]]
    fillet(f5_edges, radius=F5_R)


solid = f1_1.part
